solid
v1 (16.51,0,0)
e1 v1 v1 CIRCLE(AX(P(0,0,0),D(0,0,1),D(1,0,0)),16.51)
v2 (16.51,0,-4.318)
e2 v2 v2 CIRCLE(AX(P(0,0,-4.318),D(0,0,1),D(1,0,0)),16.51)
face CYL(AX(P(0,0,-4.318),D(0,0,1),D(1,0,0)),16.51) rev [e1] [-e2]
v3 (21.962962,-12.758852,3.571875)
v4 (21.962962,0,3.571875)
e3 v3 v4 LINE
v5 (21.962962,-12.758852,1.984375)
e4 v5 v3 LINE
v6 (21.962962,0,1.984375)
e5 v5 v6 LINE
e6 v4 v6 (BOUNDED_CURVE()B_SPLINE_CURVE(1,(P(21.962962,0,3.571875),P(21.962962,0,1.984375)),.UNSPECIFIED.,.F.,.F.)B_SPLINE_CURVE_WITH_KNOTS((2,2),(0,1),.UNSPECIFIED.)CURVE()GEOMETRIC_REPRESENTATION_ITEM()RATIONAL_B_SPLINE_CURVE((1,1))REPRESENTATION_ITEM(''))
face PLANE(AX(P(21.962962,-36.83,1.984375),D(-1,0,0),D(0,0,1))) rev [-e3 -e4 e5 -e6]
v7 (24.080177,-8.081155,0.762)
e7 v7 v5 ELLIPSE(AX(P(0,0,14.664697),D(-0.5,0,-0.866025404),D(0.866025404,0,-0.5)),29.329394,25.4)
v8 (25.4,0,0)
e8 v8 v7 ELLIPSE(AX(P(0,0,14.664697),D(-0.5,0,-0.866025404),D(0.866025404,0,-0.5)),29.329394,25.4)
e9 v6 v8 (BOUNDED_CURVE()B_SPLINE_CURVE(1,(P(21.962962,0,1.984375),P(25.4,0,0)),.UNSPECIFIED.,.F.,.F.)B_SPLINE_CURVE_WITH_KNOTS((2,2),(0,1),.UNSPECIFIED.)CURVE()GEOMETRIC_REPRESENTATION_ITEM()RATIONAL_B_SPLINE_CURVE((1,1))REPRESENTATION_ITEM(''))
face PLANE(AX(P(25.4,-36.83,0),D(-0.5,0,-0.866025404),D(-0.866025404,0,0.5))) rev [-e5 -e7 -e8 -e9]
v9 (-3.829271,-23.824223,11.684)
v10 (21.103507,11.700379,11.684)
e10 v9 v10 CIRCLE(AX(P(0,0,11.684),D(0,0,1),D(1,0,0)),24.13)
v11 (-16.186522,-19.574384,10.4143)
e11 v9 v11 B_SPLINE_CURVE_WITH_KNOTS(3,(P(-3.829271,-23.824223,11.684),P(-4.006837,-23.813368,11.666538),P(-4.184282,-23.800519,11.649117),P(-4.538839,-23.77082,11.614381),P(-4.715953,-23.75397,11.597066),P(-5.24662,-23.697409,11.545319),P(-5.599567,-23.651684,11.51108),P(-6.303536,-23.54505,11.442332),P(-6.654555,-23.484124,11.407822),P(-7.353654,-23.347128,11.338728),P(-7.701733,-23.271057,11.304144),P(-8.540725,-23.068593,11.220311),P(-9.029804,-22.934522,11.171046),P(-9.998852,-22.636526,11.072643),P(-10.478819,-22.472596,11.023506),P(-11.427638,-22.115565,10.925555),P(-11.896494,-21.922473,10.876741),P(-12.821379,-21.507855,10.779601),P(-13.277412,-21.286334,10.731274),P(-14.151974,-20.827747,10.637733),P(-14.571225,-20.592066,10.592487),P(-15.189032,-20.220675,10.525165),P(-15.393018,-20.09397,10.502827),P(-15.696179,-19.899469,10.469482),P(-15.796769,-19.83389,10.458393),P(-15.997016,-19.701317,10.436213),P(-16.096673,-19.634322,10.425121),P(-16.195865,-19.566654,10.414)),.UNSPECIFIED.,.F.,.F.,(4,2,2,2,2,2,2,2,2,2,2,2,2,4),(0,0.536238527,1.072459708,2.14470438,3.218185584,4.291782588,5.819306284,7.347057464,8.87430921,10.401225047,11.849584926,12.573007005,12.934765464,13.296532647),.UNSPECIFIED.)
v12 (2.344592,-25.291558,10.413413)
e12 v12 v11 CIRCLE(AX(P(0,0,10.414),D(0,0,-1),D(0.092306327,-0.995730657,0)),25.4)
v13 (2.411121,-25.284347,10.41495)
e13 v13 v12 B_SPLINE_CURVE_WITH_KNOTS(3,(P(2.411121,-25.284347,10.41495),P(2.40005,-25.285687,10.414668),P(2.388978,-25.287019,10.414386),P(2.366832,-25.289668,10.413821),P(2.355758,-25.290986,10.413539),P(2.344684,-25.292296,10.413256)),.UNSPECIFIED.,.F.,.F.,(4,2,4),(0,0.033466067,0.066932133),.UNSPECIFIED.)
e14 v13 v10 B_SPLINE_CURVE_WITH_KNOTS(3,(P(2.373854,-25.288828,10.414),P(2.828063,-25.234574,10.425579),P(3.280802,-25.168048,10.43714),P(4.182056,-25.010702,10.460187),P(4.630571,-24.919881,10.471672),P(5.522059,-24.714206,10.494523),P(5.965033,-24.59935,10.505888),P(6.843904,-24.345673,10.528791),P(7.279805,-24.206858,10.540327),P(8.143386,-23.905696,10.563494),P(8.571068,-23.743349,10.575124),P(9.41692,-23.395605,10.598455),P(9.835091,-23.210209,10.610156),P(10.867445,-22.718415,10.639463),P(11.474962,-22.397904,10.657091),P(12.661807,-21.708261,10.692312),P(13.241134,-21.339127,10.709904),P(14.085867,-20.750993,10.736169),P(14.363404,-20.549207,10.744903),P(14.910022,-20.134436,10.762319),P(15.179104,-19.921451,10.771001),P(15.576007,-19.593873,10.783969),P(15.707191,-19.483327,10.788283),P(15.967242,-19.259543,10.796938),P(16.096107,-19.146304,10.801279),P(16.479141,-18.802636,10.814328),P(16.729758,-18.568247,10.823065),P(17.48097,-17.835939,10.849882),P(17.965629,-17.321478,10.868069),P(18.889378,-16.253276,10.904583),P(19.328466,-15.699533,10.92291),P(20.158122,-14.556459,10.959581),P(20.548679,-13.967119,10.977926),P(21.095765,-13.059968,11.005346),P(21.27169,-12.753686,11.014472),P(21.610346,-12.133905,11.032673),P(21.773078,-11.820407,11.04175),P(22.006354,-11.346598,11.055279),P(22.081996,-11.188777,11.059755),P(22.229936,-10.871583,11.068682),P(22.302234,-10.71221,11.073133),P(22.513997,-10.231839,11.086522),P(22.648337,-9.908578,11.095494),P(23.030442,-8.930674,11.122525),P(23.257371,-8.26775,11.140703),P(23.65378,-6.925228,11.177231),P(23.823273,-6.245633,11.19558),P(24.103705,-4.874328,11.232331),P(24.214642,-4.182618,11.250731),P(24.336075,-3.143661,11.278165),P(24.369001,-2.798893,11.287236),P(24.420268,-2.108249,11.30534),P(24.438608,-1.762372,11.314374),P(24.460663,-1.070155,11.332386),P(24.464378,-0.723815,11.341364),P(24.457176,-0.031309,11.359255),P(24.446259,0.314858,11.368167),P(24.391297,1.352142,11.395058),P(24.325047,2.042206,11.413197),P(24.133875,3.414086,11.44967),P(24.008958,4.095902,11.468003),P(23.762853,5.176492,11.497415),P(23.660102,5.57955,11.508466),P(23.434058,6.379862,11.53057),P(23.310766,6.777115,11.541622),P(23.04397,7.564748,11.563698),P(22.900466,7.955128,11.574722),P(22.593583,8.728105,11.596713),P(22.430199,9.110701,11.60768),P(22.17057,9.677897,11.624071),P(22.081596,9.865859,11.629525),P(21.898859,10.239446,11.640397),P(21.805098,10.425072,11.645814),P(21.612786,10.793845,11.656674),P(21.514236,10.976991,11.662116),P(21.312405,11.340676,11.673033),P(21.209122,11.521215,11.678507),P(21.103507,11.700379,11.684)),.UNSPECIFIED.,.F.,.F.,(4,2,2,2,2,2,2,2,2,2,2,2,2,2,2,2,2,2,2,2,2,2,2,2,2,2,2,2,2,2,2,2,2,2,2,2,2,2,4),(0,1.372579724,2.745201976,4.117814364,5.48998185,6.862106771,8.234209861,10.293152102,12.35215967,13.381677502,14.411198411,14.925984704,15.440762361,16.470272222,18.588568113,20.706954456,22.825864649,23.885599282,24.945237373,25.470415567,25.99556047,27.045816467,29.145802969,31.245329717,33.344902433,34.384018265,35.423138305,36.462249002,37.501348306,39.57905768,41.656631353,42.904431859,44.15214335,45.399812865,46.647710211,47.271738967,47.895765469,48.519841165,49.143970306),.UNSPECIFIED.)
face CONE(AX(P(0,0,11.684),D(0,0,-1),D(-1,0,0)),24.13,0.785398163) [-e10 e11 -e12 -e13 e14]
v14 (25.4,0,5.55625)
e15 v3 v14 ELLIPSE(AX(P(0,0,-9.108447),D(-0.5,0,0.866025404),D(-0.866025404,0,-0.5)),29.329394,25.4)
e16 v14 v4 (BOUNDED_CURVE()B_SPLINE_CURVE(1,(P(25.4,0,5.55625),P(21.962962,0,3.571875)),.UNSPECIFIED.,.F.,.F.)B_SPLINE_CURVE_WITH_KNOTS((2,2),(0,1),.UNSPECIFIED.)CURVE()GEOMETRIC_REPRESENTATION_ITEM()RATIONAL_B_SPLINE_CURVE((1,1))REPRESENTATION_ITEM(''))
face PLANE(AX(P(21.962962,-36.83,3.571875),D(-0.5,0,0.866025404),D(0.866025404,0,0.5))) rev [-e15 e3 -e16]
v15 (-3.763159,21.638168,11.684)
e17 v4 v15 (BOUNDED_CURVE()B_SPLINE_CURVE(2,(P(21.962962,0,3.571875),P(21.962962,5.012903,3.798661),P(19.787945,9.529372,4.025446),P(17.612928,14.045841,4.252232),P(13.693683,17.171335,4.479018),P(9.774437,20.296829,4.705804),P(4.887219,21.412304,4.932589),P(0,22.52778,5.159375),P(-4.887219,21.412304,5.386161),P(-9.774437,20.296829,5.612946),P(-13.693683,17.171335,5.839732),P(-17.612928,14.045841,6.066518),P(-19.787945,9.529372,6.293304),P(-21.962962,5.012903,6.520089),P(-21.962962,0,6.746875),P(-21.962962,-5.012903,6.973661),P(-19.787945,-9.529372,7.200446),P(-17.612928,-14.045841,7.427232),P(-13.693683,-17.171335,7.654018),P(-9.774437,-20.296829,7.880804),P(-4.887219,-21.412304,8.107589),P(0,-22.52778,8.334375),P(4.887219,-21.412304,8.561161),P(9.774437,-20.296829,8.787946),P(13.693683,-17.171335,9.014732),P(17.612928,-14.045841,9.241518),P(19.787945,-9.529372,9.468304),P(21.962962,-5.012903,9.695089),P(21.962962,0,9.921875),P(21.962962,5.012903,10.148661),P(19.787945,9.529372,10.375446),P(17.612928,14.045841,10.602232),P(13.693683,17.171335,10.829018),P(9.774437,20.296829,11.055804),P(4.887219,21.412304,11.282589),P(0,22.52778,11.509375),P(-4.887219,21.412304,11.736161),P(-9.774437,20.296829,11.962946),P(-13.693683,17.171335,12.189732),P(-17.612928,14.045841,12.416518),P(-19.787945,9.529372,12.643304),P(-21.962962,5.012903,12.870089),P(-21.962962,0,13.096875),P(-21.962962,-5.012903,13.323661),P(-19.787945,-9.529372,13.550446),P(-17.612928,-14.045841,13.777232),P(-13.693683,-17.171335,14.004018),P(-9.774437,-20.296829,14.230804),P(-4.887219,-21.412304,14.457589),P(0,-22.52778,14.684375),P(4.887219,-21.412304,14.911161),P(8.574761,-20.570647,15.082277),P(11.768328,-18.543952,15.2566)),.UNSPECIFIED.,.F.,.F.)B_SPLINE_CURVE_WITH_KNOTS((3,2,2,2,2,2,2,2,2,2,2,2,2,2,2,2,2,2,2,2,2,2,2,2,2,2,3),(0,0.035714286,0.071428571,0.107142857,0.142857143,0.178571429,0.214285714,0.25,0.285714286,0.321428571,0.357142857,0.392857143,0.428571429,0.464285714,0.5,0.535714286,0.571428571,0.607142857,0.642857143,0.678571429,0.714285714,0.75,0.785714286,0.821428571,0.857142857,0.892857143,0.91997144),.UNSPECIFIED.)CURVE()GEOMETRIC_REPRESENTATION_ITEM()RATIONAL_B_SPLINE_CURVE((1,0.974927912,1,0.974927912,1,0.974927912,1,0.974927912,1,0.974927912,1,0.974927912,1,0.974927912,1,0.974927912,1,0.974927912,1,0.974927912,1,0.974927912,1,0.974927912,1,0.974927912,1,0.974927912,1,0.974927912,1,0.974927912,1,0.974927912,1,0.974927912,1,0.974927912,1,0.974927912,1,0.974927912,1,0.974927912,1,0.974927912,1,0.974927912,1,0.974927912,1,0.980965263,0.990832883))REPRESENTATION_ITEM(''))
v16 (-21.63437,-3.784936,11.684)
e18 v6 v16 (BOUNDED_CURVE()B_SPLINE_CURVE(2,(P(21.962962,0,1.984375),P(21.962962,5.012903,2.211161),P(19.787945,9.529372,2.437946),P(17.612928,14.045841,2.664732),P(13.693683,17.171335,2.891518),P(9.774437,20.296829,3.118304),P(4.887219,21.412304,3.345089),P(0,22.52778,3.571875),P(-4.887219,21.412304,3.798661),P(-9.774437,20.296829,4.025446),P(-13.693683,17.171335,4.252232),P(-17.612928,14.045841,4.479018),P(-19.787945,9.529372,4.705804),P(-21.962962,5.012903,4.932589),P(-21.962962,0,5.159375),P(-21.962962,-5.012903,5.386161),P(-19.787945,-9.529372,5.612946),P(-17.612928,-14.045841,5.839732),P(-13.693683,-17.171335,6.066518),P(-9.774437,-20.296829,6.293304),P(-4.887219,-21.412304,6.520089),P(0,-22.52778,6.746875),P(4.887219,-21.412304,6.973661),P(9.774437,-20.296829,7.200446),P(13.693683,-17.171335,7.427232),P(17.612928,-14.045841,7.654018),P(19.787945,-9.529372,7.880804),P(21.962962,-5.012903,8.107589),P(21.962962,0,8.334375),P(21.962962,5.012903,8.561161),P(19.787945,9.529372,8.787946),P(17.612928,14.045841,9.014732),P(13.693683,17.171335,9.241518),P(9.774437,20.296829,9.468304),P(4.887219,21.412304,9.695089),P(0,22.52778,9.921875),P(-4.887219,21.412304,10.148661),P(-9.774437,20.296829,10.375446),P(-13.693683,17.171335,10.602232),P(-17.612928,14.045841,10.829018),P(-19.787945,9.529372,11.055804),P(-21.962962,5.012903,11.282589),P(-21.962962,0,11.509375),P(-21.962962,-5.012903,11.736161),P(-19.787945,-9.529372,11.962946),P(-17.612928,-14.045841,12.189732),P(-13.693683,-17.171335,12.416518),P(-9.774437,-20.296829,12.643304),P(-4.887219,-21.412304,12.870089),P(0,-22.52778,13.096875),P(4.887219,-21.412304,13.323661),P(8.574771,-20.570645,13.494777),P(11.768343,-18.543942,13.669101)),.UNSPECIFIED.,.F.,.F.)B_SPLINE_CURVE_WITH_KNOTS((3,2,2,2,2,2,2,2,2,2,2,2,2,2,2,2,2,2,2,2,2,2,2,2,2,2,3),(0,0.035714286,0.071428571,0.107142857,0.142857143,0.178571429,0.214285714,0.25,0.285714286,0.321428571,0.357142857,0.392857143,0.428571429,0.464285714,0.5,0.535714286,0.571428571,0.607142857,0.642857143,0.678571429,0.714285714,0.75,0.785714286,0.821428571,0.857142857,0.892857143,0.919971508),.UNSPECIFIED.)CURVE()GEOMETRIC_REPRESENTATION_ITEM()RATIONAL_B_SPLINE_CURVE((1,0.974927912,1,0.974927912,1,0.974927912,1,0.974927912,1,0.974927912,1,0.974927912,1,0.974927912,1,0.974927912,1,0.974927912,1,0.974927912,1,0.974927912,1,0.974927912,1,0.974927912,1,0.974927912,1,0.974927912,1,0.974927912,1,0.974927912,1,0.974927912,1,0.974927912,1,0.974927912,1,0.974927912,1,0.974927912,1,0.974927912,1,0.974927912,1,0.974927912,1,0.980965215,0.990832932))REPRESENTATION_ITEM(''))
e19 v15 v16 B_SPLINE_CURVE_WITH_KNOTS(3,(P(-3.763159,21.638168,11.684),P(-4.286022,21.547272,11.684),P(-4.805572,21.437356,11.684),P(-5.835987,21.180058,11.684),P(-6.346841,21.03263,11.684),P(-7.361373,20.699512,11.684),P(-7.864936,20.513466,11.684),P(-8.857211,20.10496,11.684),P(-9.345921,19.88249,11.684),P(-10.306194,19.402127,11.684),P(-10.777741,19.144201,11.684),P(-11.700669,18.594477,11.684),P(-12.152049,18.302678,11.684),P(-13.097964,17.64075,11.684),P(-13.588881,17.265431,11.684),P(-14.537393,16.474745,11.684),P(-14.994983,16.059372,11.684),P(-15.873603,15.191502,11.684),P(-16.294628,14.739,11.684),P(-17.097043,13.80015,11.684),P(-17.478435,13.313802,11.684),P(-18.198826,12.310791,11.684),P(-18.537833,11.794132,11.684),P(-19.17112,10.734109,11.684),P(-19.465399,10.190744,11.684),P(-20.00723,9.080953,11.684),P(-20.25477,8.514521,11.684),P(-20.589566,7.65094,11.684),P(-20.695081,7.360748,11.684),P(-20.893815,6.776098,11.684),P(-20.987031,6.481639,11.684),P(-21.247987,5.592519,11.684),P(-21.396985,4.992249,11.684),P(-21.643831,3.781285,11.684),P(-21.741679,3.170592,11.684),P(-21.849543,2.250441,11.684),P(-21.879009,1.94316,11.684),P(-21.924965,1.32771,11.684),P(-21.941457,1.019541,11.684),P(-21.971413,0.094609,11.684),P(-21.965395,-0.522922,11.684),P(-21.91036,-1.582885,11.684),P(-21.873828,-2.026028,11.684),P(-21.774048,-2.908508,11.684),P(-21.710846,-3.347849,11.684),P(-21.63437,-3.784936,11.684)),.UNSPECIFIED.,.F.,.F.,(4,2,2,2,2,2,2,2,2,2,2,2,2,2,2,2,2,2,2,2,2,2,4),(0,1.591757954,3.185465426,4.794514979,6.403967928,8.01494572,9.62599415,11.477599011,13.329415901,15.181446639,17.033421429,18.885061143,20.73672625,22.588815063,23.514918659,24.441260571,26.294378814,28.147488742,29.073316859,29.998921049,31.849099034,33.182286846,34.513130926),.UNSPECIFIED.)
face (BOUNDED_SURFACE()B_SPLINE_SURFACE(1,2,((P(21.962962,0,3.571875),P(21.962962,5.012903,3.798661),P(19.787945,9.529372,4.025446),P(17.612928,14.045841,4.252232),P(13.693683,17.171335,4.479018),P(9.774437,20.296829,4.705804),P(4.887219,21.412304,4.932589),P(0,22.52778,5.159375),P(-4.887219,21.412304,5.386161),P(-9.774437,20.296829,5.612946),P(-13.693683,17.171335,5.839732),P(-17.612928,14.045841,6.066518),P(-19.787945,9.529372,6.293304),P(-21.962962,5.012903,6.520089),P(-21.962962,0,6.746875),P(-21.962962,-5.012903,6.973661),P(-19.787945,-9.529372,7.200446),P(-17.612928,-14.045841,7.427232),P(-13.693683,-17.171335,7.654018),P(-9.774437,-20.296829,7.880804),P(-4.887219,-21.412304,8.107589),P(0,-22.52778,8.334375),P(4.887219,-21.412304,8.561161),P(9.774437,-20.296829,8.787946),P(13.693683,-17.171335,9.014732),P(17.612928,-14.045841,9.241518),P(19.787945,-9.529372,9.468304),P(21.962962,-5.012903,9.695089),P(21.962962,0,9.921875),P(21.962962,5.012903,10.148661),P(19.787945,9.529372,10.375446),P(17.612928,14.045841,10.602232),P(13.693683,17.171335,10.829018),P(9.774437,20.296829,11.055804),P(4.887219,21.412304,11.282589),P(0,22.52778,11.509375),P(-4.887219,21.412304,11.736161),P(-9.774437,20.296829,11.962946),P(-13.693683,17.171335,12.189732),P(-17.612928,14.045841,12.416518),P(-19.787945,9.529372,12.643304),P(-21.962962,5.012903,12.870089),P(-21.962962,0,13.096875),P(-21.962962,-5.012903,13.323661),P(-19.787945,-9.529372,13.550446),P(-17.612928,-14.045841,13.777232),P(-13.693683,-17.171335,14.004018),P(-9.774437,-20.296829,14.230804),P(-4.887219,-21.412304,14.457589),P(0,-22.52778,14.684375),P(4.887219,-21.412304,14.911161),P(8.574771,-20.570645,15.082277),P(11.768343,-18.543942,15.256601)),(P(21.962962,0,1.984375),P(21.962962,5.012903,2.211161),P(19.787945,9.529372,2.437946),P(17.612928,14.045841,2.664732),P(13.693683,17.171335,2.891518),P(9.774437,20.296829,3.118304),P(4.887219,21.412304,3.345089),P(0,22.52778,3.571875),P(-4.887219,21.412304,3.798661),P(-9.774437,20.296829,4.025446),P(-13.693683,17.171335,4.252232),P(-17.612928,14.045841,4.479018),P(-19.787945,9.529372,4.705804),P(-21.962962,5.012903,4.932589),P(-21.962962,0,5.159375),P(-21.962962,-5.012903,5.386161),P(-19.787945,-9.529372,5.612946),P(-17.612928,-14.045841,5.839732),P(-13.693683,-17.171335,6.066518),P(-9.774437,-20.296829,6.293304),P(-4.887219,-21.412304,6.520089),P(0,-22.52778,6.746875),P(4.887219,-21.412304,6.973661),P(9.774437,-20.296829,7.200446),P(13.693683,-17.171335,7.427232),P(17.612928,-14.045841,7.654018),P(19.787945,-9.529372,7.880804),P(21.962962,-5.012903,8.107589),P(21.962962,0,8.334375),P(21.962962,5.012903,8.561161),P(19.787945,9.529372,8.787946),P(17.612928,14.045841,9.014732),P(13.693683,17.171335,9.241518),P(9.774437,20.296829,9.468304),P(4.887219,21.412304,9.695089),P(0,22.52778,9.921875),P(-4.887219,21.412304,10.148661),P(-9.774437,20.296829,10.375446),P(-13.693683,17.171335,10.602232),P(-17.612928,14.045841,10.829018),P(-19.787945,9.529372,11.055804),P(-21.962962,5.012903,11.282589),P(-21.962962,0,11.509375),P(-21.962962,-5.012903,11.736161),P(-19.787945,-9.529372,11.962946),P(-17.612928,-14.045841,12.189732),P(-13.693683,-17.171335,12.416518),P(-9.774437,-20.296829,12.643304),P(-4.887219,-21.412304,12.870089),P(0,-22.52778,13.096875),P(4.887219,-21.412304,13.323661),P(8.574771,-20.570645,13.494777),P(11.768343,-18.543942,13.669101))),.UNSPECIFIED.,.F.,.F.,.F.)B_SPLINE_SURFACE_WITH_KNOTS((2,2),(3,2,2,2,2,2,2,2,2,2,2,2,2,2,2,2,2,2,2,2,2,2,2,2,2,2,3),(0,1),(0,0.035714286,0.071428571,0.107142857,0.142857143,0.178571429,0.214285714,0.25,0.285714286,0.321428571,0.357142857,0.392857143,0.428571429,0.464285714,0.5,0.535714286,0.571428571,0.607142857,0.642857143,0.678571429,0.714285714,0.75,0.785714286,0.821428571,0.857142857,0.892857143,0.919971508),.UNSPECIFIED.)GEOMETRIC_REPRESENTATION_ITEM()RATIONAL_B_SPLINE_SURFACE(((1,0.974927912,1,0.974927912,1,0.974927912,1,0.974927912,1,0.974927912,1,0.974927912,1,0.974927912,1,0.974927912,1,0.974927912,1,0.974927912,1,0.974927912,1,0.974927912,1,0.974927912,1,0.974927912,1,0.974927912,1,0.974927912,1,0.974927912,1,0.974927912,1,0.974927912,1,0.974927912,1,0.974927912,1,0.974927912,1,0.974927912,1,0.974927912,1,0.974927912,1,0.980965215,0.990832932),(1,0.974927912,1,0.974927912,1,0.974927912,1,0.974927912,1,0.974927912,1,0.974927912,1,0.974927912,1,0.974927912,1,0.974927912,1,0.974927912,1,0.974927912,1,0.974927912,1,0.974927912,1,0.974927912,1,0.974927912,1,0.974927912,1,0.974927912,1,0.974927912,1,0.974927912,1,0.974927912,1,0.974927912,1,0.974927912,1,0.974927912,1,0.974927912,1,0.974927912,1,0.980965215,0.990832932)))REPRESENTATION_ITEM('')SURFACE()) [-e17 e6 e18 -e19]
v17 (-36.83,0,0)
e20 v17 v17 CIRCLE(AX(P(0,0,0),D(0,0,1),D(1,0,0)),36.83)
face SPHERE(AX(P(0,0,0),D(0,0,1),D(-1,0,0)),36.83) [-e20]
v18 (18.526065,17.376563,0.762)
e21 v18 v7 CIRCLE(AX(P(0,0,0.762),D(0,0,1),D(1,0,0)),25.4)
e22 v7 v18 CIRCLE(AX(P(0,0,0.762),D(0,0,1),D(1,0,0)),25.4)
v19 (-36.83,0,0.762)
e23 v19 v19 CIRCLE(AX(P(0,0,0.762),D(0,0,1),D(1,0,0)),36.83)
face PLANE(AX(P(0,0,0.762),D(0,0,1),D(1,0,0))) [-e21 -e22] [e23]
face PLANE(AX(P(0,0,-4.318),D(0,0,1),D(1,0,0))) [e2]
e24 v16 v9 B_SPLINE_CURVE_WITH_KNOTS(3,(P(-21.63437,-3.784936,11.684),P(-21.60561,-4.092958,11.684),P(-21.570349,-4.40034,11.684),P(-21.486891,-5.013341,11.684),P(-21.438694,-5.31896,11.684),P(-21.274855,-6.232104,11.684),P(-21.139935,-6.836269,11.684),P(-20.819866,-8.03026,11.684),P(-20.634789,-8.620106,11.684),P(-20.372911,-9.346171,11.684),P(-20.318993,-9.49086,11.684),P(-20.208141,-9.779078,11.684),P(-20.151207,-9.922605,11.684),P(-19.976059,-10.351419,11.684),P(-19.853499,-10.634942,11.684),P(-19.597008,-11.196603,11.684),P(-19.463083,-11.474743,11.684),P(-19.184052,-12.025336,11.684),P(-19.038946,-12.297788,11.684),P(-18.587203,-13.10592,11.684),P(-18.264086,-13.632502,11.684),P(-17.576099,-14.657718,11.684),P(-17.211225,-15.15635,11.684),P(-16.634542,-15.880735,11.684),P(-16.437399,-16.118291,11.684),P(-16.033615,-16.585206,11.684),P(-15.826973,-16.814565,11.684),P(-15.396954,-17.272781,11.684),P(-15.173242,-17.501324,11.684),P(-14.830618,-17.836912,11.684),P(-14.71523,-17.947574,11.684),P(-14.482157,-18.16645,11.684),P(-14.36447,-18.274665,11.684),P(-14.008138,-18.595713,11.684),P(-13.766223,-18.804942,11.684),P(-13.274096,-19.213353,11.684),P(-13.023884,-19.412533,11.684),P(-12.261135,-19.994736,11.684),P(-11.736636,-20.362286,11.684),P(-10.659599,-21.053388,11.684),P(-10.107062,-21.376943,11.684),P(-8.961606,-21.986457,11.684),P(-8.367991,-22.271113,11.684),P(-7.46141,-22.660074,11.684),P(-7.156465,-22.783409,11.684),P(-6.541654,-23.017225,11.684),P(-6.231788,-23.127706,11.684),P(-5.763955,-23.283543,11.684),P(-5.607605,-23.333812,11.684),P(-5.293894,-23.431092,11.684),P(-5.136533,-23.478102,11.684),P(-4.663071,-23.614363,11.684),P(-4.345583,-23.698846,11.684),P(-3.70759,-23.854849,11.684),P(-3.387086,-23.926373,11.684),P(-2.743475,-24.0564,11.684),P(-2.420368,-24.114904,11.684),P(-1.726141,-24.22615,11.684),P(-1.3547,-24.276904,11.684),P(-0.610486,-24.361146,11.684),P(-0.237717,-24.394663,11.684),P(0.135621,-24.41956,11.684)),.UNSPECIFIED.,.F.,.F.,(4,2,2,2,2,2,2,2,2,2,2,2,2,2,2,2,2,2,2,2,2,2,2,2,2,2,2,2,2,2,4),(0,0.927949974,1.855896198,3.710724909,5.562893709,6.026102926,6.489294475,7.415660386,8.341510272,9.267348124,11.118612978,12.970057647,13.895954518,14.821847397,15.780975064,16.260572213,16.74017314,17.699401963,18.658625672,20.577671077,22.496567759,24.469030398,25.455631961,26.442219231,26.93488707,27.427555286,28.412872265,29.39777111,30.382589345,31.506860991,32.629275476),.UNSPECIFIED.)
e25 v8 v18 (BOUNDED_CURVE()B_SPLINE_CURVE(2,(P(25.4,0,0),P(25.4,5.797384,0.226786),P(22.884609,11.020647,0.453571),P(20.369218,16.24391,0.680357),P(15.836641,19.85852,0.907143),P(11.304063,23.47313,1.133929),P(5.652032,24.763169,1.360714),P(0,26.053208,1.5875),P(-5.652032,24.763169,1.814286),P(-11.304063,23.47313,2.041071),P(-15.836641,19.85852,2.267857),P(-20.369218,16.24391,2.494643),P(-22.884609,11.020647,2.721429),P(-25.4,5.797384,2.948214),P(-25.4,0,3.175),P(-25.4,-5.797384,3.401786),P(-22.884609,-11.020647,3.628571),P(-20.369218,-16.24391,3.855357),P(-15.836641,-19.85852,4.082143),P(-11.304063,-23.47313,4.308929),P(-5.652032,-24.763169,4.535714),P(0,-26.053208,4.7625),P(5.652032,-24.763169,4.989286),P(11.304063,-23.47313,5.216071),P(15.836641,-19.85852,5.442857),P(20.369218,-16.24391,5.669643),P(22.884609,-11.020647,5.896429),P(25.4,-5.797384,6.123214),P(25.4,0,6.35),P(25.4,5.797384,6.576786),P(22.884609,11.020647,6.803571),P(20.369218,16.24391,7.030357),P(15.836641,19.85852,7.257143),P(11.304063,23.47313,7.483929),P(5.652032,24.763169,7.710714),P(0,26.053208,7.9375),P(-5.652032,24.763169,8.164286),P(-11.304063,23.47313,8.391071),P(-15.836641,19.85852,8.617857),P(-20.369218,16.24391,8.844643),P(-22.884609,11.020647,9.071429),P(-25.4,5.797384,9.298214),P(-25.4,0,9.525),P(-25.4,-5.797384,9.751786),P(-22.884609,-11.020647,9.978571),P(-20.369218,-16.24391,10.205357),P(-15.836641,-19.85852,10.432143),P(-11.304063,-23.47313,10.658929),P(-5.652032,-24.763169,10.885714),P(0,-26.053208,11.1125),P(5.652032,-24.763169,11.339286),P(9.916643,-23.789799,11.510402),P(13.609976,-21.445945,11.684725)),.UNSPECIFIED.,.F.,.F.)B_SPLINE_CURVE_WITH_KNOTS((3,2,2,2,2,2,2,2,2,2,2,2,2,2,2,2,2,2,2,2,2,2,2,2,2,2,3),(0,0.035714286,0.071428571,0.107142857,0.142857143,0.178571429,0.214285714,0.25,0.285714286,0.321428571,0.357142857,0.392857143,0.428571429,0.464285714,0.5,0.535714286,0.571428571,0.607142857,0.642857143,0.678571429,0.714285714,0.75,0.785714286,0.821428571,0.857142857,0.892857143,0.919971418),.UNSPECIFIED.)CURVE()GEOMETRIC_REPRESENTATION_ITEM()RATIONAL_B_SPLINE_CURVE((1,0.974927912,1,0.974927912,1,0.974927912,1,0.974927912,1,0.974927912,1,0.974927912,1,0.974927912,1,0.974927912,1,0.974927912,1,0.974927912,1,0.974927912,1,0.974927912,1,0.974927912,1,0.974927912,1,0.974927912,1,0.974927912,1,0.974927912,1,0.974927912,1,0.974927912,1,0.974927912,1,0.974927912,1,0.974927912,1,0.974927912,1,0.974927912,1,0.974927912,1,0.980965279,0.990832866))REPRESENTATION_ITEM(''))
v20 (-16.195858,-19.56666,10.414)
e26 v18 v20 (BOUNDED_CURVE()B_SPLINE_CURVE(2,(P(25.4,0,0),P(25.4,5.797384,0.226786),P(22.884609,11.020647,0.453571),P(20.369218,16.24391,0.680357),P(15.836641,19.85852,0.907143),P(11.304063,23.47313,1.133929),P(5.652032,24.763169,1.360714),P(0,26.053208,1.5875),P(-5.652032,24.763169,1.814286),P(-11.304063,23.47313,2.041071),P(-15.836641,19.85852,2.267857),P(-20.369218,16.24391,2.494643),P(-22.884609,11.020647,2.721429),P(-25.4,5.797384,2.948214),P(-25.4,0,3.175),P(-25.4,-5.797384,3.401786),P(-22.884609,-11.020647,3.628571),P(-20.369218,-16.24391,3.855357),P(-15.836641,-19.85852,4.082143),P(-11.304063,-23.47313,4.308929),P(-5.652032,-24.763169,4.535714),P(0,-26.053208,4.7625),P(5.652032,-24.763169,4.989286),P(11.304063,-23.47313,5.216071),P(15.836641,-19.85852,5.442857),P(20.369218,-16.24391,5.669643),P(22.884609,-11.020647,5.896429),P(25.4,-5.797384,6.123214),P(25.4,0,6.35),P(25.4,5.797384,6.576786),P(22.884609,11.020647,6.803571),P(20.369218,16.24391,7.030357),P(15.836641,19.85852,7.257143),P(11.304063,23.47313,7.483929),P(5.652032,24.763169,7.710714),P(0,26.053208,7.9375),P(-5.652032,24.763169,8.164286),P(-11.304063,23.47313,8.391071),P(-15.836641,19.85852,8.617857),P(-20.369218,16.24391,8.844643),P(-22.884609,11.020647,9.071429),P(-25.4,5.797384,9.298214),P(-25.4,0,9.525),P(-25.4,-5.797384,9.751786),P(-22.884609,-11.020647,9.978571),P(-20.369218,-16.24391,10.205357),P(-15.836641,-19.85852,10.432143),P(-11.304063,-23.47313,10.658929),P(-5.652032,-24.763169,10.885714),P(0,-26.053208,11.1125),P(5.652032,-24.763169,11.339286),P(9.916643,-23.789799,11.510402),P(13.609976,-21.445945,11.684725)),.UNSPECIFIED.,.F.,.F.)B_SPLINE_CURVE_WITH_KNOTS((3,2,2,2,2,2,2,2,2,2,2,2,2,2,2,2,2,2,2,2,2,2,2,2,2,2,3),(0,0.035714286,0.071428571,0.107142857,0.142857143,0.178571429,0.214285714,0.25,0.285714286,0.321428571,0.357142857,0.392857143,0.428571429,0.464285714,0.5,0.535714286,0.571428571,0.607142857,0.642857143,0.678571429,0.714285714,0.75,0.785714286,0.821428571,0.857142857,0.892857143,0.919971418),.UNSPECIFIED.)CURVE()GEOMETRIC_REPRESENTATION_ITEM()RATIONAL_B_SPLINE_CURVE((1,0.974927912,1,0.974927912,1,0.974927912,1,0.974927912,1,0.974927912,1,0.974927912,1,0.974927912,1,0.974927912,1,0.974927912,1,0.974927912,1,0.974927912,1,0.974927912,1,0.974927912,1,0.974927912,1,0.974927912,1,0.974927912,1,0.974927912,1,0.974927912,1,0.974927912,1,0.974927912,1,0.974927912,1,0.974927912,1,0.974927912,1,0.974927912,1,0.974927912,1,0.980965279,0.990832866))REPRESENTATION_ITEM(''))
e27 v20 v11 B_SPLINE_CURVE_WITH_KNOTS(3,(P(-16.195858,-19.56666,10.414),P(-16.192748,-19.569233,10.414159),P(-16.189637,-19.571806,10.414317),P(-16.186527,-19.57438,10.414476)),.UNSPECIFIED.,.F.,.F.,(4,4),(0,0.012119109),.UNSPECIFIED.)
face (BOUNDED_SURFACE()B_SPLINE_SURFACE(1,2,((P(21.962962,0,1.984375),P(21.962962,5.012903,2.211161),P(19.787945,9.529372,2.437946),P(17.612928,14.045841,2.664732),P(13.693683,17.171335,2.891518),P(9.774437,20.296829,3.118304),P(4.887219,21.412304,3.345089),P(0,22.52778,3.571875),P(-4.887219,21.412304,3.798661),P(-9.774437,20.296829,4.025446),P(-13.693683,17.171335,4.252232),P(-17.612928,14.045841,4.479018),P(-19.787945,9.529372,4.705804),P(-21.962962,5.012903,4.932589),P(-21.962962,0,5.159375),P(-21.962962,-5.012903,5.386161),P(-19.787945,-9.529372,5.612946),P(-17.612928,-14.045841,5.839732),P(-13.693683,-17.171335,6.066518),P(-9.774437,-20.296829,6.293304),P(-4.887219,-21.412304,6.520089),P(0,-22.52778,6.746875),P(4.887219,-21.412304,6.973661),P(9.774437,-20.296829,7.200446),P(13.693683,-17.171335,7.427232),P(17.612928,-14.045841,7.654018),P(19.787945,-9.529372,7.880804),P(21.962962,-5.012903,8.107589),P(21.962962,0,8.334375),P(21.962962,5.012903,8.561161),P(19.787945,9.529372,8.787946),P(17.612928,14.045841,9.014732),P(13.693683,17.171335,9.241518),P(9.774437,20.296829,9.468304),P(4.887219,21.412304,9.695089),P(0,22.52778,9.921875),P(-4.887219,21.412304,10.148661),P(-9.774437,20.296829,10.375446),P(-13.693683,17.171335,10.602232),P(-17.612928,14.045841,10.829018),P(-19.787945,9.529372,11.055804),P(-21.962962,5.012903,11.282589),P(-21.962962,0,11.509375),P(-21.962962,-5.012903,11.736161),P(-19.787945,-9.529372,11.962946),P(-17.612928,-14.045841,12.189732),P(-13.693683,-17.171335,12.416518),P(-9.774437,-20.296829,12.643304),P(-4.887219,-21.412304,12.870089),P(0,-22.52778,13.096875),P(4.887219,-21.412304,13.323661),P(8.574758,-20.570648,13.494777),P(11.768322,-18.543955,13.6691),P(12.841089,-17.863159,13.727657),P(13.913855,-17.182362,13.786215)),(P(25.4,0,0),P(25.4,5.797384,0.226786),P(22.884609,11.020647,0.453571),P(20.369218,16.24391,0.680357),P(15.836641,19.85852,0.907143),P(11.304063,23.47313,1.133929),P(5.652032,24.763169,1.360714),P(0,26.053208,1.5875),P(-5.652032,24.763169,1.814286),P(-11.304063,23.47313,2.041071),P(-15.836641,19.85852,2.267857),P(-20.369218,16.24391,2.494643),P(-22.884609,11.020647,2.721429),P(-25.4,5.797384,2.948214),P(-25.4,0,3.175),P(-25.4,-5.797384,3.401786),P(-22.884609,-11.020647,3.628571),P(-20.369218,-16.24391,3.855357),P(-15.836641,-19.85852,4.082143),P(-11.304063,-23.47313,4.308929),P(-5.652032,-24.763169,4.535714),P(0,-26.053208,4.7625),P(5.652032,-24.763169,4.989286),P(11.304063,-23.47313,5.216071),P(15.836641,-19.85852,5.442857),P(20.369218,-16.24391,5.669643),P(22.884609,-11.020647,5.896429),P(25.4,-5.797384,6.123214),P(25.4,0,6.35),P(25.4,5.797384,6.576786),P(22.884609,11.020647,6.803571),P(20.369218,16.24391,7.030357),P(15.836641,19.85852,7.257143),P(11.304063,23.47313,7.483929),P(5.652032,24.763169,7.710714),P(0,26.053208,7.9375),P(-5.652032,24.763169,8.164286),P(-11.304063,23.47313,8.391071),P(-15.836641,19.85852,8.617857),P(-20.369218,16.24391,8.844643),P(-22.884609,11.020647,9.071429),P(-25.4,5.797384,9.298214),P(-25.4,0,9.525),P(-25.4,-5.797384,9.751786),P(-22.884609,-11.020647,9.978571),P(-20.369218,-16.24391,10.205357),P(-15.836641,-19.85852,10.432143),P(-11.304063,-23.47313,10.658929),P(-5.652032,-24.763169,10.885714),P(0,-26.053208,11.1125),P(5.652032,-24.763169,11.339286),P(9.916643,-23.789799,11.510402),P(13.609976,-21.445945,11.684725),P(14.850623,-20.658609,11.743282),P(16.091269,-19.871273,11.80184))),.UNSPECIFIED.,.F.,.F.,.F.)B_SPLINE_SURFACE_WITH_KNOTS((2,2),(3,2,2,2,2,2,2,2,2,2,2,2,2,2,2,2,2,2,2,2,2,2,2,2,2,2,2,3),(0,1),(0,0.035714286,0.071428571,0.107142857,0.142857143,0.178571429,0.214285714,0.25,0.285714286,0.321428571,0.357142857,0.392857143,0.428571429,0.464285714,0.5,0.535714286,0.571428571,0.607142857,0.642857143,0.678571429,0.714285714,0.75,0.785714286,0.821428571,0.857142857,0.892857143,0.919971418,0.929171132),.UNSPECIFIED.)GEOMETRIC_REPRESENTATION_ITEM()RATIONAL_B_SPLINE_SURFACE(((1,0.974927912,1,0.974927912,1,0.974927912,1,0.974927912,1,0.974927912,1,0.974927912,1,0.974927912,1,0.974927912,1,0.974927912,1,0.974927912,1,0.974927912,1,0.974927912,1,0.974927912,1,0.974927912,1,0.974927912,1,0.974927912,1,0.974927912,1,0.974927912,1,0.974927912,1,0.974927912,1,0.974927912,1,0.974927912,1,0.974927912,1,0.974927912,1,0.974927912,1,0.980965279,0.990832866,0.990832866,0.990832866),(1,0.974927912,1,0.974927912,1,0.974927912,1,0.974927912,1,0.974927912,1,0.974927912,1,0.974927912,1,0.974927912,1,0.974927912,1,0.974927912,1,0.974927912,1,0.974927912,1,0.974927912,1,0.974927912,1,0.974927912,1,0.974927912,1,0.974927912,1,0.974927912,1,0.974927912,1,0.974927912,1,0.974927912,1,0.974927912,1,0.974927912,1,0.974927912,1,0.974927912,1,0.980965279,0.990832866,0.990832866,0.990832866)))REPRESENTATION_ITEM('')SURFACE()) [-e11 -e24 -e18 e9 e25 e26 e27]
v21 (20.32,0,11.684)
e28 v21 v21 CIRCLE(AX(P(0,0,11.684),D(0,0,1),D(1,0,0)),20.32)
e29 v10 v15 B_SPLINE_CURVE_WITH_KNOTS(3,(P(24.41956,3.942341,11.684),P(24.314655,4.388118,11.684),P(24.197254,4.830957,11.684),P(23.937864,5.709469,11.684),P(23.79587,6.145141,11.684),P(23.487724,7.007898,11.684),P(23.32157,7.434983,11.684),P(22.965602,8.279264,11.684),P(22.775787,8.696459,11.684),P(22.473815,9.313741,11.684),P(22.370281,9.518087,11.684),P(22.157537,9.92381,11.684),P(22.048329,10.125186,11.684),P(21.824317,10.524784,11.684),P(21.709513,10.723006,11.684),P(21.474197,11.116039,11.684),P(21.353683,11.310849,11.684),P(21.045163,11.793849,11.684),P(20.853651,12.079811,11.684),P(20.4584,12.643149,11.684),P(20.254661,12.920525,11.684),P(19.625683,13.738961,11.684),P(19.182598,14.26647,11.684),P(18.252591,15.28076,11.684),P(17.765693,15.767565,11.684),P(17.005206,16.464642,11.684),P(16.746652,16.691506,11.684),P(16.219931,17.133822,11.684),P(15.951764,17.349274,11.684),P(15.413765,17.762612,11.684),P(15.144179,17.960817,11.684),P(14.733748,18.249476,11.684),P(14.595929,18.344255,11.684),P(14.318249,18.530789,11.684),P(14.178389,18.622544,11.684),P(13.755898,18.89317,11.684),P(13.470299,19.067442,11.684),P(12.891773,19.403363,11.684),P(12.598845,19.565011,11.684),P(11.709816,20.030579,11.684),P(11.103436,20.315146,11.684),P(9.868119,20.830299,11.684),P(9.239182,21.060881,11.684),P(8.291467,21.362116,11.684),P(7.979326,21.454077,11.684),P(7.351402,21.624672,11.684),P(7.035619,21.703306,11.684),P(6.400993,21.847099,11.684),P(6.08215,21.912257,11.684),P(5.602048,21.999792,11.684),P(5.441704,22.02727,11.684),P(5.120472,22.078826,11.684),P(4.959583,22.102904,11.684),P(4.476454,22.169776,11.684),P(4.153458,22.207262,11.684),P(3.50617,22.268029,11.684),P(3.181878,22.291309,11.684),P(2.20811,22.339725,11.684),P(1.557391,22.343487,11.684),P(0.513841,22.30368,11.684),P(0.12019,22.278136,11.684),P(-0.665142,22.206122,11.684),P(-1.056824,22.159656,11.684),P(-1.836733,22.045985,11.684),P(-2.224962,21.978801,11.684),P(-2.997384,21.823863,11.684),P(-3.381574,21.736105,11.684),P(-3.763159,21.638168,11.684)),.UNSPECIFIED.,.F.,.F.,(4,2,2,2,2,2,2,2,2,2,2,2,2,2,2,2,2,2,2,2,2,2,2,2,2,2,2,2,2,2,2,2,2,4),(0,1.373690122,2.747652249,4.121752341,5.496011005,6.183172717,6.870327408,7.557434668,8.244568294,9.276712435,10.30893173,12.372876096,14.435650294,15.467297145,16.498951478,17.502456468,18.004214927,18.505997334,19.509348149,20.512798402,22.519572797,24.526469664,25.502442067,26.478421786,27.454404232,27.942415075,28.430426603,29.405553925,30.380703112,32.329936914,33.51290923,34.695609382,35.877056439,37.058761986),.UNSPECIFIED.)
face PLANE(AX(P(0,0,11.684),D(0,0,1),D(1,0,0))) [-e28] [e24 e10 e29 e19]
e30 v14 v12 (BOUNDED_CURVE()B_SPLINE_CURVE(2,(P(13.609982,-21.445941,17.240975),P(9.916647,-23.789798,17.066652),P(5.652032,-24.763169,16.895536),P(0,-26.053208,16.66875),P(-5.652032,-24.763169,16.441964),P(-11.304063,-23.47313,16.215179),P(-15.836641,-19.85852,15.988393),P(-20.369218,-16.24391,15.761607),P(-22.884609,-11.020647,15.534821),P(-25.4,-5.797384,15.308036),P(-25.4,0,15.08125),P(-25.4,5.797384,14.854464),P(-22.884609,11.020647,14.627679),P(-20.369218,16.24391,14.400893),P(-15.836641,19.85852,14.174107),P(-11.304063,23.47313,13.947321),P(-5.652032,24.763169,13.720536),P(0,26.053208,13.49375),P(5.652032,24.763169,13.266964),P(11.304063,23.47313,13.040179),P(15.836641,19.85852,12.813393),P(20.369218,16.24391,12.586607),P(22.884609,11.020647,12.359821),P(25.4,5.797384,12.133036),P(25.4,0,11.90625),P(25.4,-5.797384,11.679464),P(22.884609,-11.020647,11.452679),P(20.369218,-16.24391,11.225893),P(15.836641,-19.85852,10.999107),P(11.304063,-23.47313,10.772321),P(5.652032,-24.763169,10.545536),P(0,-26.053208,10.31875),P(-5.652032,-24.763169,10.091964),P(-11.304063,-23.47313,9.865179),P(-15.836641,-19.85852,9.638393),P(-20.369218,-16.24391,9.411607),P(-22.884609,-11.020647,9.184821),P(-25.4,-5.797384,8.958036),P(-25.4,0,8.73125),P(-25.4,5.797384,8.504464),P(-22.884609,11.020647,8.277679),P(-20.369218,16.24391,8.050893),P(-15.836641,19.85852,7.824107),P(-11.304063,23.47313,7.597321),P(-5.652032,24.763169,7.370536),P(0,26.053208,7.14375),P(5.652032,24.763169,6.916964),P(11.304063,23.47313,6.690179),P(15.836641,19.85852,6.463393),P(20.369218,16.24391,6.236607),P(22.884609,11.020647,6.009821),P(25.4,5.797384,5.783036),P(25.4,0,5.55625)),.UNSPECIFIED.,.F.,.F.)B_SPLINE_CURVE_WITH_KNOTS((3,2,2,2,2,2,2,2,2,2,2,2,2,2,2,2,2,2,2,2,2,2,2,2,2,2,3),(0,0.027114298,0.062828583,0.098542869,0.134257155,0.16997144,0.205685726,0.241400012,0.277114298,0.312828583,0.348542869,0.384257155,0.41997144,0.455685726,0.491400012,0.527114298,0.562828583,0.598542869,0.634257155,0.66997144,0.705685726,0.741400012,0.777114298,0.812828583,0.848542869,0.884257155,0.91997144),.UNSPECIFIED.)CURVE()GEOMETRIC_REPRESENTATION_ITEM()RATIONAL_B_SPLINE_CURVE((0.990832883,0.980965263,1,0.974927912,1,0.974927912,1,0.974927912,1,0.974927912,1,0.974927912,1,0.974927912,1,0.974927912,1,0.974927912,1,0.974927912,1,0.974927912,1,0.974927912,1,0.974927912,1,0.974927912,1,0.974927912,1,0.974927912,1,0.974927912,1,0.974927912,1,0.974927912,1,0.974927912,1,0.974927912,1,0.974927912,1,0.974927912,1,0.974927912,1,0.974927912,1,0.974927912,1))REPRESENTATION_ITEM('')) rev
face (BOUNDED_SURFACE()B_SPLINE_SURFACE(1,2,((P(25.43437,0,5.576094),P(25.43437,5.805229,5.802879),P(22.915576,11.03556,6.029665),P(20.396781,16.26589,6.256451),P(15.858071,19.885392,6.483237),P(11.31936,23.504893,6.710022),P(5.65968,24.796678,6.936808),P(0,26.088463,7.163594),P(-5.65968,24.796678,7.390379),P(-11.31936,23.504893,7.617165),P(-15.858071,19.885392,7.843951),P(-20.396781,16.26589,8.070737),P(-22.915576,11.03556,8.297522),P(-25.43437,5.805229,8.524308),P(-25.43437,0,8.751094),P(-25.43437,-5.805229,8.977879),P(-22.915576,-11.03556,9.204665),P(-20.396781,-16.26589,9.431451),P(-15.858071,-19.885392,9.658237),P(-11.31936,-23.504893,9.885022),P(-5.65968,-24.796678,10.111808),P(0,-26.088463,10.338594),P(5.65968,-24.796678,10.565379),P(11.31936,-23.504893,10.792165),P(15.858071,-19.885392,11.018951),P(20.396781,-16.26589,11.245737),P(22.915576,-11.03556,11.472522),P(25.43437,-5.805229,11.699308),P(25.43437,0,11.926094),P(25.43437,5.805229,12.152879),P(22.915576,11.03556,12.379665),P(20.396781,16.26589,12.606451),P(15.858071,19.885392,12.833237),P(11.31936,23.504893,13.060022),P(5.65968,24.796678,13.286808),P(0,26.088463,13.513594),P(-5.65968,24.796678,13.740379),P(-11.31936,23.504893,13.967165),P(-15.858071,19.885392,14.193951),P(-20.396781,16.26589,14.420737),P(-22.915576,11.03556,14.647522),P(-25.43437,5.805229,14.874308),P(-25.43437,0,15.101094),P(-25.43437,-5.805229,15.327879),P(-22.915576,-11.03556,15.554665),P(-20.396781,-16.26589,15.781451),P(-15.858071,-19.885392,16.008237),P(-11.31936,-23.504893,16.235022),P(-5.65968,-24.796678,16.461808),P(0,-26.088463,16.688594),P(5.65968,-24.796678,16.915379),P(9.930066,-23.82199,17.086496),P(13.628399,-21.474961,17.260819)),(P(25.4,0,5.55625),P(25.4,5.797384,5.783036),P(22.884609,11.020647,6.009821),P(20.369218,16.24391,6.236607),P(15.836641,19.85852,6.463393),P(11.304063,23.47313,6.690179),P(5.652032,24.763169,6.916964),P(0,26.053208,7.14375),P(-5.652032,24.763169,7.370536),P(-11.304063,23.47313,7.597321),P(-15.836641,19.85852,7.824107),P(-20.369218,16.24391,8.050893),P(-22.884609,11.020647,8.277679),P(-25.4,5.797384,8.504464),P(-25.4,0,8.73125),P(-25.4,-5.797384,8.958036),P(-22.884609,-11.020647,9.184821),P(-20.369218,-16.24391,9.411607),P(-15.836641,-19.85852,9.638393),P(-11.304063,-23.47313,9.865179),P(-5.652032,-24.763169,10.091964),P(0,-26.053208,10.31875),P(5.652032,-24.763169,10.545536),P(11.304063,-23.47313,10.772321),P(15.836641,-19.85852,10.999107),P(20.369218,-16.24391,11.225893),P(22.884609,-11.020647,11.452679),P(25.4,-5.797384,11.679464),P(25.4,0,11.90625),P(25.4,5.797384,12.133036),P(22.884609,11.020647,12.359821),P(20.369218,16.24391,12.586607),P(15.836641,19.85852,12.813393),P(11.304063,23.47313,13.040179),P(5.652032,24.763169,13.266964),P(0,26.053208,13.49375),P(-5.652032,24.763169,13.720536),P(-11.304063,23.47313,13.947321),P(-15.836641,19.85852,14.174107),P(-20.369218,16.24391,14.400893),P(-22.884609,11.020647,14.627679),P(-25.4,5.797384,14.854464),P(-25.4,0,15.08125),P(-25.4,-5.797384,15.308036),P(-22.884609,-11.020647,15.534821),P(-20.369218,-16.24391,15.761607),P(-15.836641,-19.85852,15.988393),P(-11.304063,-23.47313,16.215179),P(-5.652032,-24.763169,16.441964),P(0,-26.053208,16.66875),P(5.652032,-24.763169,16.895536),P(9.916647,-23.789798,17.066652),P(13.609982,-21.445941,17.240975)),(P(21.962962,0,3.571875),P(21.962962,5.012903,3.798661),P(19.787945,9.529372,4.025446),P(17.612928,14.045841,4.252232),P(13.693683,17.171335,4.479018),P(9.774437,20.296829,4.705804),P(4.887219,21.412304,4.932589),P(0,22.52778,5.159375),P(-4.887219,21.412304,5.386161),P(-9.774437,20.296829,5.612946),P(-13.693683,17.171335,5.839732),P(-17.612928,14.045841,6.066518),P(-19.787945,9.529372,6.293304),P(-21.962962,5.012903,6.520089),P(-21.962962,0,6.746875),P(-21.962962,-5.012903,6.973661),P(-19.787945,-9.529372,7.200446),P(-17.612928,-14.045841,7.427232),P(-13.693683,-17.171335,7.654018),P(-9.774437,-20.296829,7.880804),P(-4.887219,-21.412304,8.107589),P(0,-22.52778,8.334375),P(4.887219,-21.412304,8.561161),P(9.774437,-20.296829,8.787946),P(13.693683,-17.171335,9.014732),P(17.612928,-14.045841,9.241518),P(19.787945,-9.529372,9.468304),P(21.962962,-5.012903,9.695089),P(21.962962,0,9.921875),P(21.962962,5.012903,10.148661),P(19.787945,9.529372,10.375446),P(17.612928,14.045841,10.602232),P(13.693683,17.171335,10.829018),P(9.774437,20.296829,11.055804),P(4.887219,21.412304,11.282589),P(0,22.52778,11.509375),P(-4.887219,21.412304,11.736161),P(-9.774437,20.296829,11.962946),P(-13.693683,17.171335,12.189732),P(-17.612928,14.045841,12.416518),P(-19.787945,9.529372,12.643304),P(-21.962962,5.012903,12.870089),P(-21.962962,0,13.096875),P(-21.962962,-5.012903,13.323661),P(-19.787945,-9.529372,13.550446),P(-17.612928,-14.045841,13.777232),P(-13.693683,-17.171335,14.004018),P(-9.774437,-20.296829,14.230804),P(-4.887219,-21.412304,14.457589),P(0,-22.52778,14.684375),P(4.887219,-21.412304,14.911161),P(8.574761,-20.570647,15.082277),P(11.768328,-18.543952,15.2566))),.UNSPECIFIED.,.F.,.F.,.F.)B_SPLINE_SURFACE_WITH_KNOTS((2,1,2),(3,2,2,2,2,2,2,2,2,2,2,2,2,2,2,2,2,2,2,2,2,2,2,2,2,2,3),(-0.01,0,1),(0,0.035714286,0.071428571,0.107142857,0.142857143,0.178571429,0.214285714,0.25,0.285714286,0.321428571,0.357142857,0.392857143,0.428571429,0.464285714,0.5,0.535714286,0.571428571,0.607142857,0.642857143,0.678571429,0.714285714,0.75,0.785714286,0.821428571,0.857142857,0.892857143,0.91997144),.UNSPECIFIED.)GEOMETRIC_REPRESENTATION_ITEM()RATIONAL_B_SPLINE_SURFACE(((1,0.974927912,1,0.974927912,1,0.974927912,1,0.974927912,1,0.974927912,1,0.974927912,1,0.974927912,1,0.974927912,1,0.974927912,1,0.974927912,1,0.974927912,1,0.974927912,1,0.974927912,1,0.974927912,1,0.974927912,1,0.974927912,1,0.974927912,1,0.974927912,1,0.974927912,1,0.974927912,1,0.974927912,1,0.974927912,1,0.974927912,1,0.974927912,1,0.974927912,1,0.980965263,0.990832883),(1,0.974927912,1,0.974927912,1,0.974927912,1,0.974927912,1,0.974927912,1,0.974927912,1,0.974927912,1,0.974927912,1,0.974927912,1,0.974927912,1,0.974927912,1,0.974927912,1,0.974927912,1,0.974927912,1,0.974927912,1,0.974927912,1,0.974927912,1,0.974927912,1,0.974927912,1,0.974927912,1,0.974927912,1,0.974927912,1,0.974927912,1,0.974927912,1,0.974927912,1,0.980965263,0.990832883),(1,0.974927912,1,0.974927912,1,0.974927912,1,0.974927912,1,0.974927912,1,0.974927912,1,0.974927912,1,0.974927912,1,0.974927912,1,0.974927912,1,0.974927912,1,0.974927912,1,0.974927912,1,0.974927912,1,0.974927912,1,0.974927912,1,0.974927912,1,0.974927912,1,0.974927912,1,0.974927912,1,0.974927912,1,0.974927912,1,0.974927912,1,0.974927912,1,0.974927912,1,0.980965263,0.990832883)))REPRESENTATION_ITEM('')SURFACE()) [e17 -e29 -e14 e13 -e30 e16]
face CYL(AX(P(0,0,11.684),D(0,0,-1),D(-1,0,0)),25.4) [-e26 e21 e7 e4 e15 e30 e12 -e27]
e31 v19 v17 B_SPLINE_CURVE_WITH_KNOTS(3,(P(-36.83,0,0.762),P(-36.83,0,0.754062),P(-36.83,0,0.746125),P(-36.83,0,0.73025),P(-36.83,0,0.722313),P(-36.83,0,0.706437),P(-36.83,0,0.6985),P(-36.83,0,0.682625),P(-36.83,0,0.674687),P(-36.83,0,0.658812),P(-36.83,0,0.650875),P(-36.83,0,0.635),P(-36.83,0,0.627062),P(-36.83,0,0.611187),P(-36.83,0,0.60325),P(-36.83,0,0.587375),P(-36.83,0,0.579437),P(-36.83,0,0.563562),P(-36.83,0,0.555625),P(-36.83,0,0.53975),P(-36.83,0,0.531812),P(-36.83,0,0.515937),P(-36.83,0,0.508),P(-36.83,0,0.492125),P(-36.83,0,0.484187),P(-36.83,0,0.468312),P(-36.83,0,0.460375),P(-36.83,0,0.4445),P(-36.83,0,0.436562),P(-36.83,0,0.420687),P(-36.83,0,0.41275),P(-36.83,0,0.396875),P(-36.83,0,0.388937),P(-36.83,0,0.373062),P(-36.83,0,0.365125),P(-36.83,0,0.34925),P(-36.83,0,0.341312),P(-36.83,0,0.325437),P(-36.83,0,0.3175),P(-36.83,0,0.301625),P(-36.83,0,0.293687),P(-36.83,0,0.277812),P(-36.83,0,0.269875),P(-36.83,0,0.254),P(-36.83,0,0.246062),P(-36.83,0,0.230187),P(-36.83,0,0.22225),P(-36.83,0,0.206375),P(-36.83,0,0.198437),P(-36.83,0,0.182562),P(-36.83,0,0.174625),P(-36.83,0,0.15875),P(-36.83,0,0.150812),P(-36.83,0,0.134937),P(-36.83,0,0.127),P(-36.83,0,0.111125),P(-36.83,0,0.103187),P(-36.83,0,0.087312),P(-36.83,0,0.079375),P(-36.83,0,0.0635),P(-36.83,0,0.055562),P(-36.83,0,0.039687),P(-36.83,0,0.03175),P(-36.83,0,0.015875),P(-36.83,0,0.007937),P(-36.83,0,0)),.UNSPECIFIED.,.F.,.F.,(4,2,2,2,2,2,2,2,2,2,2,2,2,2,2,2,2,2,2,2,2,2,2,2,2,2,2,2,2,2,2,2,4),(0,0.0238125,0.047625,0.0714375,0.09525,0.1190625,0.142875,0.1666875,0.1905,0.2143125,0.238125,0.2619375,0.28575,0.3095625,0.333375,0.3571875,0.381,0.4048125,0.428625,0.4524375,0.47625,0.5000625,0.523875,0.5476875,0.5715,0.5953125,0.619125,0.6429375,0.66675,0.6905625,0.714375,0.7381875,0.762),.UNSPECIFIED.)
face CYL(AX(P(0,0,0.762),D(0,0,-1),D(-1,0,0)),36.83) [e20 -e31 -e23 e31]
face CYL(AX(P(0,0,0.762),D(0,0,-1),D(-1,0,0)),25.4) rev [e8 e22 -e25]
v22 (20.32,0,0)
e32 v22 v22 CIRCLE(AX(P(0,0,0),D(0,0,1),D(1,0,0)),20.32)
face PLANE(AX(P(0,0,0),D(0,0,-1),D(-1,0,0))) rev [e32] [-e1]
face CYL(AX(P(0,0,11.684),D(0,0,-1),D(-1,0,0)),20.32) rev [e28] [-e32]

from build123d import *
from build123d.topology import SkipClean

# Parameters (mm, degrees)
SKETCH4_R           = 25.4
SKETCH4_R_2         = 20.32
BOSS_EXTRUDE1_DEPTH = 11.684
CHAMFER1_SIZE       = 1.27
THREAD3_PITCH       = 6.35
CUT_EXTRUDE2_DEPTH  = 64.791431358
SKETCH19_R          = 16.51
CUT_EXTRUDE3_DEPTH  = 4.318
SKETCH21_R          = 36.83
SKETCH21_R_2        = 25.4
BOSS_EXTRUDE2_DEPTH = 0.762


with BuildPart() as part:
    # Sketch1 → Revolve1 (revolve)
    with BuildSketch(Plane(origin=(0, 0, 0), x_dir=(1, 0, 0), z_dir=(0, 1, 0))):
        with BuildLine():
            Line((0, 0), (0, 36.83))
            ThreePointArc((0, 36.83), (-26.042742751, 26.042742751), (-36.83, 0))
            Line((-36.83, 0), (0, 0))
        make_face()
    revolve(axis=Axis((0, 0, 0), (0, 0, -1)))

    # Sketch4 → Boss-Extrude1 (add)
    with BuildSketch(Plane.XY):
        with Locations(Location((0, 0, 0), (0, 0, 180))):
            Circle(SKETCH4_R)
        Circle(SKETCH4_R_2, mode=Mode.SUBTRACT)
    extrude(amount=BOSS_EXTRUDE1_DEPTH)

    # Chamfer1
    chamfer1_edges = [part.edges().sort_by_distance(p)[0] for p in [
        (25.4, 0, 11.684),
    ]]
    chamfer(chamfer1_edges, length=CHAMFER1_SIZE)

    # Thread3: the profile of Thread Profile4 profile screwed along a right-hand helix of 1.84 turns, 14 arcs to a turn; built about Z, then put on its axis
    with SkipClean():  # the faces are left unmerged after this step: merging them gives an invalid solid
        thread3_z = Axis((0, 0, 0), (0, 0, 1))
        thread3_corners = [(25.4003, 0, -0.000173205), (25.4003, 0, 5.556423188), (21.962961694, 0, 3.571874991), (21.962961694, 0, 1.984374991)]
        with BuildLine(mode=Mode.PRIVATE) as thread3_profile:
            Line(thread3_corners[0], thread3_corners[1])
            Line(thread3_corners[1], thread3_corners[2])
            Line(thread3_corners[2], thread3_corners[3])
            Line(thread3_corners[3], thread3_corners[0])
        thread3_cap = Face(thread3_profile.wire())
        thread3_turn_angles = [0, 12.857142857, 25.714285714, 38.571428571, 51.428571429, 64.285714286, 77.142857143, 90, 102.857142857, 115.714285714, 128.571428571, 141.428571429, 154.285714286, 167.142857143, 180, 192.857142857, 205.714285714, 218.571428571, 231.428571429, 244.285714286, 257.142857143, 270, 282.857142857, 295.714285714, 308.571428571, 321.428571429, 334.285714286, 347.142857143, 360]
        thread3_turn_weights = [1, 0.9749279121818236, 1, 0.9749279121818236, 1, 0.9749279121818236, 1, 0.9749279121818236, 1, 0.9749279121818236, 1, 0.9749279121818236, 1, 0.9749279121818236, 1, 0.9749279121818236, 1, 0.9749279121818236, 1, 0.9749279121818236, 1, 0.9749279121818236, 1, 0.9749279121818237, 1, 0.9749279121818236, 1, 0.9749279121818236, 1]
        thread3_turn_rails = [Edge.make_bspline([Vector(p[0], p[1], 0).rotate(thread3_z, thread3_turn_angles[k]) / thread3_turn_weights[k] + Vector(0, 0, p[2] + THREAD3_PITCH * thread3_turn_angles[k] / 360) for k in range(29)], [0, 0, 0, 1, 1, 2, 2, 3, 3, 4, 4, 5, 5, 6, 6, 7, 7, 8, 8, 9, 9, 10, 10, 11, 11, 12, 12, 13, 13, 14, 14, 14], 2, thread3_turn_weights) for p in thread3_corners]
        thread3_turn_sides = [Face.make_surface_from_curves(thread3_turn_rails[p[0]], thread3_turn_rails[p[1]]) for p in [(0, 1), (1, 2), (2, 3), (3, 0)]]
        thread3_last_angles = [360, 372.857142857, 385.714285714, 398.571428571, 411.428571429, 424.285714286, 437.142857143, 450, 462.857142857, 475.714285714, 488.571428571, 501.428571429, 514.285714286, 527.142857143, 540, 552.857142857, 565.714285714, 578.571428571, 591.428571429, 604.285714286, 617.142857143, 630, 642.857142857, 652.628571429, 662.4]
        thread3_last_weights = [1, 0.9749279121818236, 1, 0.9749279121818236, 1, 0.9749279121818237, 1, 0.9749279121818235, 1, 0.9749279121818237, 1, 0.9749279121818237, 1, 0.9749279121818235, 1, 0.9749279121818235, 1, 0.9749279121818237, 1, 0.9749279121818237, 1, 0.9749279121818235, 1, 0.9854926535657266, 1]
        thread3_last_rails = [Edge.make_bspline([Vector(p[0], p[1], 0).rotate(thread3_z, thread3_last_angles[k]) / thread3_last_weights[k] + Vector(0, 0, p[2] + THREAD3_PITCH * thread3_last_angles[k] / 360) for k in range(25)], [0, 0, 0, 1, 1, 2, 2, 3, 3, 4, 4, 5, 5, 6, 6, 7, 7, 8, 8, 9, 9, 10, 10, 11, 11, 12, 12, 12], 2, thread3_last_weights) for p in thread3_corners]
        thread3_last_sides = [Face.make_surface_from_curves(thread3_last_rails[p[0]], thread3_last_rails[p[1]]) for p in [(0, 1), (1, 2), (2, 3), (3, 0)]]
        thread3 = Plane(origin=(0, 0, 0), x_dir=(1, 0, 0), z_dir=(0, 0, 1)) * Solid(Shell([*thread3_turn_sides, *thread3_last_sides, thread3_cap, thread3_cap.rotate(thread3_z, 662.4).moved(Location((0, 0, THREAD3_PITCH * 662.4 / 360)))]))
        add(thread3, mode=Mode.SUBTRACT)

    # Sketch18 → Cut-Extrude2 (cut, through all)
    with SkipClean():  # the faces are left unmerged after this step: merging them gives an invalid solid
        with BuildSketch(Plane(origin=(0, 0, 0), x_dir=(1, 0, 0), z_dir=(0, 1, 0))):
            Polygon((25.4, 0), (21.962961694, -1.984374991), (21.962961694, -3.571874991), (25.4, -5.556249983), align=None)
        extrude(amount=-CUT_EXTRUDE2_DEPTH, mode=Mode.SUBTRACT)

    # Sketch19 → Cut-Extrude3 (cut)
    with SkipClean():  # the faces are left unmerged after this step: merging them gives an invalid solid
        with BuildSketch(Plane.XY):
            Circle(SKETCH19_R)
        extrude(amount=-CUT_EXTRUDE3_DEPTH, mode=Mode.SUBTRACT)

    # Sketch21 → Boss-Extrude2 (add)
    with SkipClean():  # the faces are left unmerged after this step: merging them gives an invalid solid
        with BuildSketch(Plane.XY):
            with Locations(Location((0, 0, 0), (0, 0, 180))):
                Circle(SKETCH21_R)
            Circle(SKETCH21_R_2, mode=Mode.SUBTRACT)
        extrude(amount=BOSS_EXTRUDE2_DEPTH)


solid = part.part
